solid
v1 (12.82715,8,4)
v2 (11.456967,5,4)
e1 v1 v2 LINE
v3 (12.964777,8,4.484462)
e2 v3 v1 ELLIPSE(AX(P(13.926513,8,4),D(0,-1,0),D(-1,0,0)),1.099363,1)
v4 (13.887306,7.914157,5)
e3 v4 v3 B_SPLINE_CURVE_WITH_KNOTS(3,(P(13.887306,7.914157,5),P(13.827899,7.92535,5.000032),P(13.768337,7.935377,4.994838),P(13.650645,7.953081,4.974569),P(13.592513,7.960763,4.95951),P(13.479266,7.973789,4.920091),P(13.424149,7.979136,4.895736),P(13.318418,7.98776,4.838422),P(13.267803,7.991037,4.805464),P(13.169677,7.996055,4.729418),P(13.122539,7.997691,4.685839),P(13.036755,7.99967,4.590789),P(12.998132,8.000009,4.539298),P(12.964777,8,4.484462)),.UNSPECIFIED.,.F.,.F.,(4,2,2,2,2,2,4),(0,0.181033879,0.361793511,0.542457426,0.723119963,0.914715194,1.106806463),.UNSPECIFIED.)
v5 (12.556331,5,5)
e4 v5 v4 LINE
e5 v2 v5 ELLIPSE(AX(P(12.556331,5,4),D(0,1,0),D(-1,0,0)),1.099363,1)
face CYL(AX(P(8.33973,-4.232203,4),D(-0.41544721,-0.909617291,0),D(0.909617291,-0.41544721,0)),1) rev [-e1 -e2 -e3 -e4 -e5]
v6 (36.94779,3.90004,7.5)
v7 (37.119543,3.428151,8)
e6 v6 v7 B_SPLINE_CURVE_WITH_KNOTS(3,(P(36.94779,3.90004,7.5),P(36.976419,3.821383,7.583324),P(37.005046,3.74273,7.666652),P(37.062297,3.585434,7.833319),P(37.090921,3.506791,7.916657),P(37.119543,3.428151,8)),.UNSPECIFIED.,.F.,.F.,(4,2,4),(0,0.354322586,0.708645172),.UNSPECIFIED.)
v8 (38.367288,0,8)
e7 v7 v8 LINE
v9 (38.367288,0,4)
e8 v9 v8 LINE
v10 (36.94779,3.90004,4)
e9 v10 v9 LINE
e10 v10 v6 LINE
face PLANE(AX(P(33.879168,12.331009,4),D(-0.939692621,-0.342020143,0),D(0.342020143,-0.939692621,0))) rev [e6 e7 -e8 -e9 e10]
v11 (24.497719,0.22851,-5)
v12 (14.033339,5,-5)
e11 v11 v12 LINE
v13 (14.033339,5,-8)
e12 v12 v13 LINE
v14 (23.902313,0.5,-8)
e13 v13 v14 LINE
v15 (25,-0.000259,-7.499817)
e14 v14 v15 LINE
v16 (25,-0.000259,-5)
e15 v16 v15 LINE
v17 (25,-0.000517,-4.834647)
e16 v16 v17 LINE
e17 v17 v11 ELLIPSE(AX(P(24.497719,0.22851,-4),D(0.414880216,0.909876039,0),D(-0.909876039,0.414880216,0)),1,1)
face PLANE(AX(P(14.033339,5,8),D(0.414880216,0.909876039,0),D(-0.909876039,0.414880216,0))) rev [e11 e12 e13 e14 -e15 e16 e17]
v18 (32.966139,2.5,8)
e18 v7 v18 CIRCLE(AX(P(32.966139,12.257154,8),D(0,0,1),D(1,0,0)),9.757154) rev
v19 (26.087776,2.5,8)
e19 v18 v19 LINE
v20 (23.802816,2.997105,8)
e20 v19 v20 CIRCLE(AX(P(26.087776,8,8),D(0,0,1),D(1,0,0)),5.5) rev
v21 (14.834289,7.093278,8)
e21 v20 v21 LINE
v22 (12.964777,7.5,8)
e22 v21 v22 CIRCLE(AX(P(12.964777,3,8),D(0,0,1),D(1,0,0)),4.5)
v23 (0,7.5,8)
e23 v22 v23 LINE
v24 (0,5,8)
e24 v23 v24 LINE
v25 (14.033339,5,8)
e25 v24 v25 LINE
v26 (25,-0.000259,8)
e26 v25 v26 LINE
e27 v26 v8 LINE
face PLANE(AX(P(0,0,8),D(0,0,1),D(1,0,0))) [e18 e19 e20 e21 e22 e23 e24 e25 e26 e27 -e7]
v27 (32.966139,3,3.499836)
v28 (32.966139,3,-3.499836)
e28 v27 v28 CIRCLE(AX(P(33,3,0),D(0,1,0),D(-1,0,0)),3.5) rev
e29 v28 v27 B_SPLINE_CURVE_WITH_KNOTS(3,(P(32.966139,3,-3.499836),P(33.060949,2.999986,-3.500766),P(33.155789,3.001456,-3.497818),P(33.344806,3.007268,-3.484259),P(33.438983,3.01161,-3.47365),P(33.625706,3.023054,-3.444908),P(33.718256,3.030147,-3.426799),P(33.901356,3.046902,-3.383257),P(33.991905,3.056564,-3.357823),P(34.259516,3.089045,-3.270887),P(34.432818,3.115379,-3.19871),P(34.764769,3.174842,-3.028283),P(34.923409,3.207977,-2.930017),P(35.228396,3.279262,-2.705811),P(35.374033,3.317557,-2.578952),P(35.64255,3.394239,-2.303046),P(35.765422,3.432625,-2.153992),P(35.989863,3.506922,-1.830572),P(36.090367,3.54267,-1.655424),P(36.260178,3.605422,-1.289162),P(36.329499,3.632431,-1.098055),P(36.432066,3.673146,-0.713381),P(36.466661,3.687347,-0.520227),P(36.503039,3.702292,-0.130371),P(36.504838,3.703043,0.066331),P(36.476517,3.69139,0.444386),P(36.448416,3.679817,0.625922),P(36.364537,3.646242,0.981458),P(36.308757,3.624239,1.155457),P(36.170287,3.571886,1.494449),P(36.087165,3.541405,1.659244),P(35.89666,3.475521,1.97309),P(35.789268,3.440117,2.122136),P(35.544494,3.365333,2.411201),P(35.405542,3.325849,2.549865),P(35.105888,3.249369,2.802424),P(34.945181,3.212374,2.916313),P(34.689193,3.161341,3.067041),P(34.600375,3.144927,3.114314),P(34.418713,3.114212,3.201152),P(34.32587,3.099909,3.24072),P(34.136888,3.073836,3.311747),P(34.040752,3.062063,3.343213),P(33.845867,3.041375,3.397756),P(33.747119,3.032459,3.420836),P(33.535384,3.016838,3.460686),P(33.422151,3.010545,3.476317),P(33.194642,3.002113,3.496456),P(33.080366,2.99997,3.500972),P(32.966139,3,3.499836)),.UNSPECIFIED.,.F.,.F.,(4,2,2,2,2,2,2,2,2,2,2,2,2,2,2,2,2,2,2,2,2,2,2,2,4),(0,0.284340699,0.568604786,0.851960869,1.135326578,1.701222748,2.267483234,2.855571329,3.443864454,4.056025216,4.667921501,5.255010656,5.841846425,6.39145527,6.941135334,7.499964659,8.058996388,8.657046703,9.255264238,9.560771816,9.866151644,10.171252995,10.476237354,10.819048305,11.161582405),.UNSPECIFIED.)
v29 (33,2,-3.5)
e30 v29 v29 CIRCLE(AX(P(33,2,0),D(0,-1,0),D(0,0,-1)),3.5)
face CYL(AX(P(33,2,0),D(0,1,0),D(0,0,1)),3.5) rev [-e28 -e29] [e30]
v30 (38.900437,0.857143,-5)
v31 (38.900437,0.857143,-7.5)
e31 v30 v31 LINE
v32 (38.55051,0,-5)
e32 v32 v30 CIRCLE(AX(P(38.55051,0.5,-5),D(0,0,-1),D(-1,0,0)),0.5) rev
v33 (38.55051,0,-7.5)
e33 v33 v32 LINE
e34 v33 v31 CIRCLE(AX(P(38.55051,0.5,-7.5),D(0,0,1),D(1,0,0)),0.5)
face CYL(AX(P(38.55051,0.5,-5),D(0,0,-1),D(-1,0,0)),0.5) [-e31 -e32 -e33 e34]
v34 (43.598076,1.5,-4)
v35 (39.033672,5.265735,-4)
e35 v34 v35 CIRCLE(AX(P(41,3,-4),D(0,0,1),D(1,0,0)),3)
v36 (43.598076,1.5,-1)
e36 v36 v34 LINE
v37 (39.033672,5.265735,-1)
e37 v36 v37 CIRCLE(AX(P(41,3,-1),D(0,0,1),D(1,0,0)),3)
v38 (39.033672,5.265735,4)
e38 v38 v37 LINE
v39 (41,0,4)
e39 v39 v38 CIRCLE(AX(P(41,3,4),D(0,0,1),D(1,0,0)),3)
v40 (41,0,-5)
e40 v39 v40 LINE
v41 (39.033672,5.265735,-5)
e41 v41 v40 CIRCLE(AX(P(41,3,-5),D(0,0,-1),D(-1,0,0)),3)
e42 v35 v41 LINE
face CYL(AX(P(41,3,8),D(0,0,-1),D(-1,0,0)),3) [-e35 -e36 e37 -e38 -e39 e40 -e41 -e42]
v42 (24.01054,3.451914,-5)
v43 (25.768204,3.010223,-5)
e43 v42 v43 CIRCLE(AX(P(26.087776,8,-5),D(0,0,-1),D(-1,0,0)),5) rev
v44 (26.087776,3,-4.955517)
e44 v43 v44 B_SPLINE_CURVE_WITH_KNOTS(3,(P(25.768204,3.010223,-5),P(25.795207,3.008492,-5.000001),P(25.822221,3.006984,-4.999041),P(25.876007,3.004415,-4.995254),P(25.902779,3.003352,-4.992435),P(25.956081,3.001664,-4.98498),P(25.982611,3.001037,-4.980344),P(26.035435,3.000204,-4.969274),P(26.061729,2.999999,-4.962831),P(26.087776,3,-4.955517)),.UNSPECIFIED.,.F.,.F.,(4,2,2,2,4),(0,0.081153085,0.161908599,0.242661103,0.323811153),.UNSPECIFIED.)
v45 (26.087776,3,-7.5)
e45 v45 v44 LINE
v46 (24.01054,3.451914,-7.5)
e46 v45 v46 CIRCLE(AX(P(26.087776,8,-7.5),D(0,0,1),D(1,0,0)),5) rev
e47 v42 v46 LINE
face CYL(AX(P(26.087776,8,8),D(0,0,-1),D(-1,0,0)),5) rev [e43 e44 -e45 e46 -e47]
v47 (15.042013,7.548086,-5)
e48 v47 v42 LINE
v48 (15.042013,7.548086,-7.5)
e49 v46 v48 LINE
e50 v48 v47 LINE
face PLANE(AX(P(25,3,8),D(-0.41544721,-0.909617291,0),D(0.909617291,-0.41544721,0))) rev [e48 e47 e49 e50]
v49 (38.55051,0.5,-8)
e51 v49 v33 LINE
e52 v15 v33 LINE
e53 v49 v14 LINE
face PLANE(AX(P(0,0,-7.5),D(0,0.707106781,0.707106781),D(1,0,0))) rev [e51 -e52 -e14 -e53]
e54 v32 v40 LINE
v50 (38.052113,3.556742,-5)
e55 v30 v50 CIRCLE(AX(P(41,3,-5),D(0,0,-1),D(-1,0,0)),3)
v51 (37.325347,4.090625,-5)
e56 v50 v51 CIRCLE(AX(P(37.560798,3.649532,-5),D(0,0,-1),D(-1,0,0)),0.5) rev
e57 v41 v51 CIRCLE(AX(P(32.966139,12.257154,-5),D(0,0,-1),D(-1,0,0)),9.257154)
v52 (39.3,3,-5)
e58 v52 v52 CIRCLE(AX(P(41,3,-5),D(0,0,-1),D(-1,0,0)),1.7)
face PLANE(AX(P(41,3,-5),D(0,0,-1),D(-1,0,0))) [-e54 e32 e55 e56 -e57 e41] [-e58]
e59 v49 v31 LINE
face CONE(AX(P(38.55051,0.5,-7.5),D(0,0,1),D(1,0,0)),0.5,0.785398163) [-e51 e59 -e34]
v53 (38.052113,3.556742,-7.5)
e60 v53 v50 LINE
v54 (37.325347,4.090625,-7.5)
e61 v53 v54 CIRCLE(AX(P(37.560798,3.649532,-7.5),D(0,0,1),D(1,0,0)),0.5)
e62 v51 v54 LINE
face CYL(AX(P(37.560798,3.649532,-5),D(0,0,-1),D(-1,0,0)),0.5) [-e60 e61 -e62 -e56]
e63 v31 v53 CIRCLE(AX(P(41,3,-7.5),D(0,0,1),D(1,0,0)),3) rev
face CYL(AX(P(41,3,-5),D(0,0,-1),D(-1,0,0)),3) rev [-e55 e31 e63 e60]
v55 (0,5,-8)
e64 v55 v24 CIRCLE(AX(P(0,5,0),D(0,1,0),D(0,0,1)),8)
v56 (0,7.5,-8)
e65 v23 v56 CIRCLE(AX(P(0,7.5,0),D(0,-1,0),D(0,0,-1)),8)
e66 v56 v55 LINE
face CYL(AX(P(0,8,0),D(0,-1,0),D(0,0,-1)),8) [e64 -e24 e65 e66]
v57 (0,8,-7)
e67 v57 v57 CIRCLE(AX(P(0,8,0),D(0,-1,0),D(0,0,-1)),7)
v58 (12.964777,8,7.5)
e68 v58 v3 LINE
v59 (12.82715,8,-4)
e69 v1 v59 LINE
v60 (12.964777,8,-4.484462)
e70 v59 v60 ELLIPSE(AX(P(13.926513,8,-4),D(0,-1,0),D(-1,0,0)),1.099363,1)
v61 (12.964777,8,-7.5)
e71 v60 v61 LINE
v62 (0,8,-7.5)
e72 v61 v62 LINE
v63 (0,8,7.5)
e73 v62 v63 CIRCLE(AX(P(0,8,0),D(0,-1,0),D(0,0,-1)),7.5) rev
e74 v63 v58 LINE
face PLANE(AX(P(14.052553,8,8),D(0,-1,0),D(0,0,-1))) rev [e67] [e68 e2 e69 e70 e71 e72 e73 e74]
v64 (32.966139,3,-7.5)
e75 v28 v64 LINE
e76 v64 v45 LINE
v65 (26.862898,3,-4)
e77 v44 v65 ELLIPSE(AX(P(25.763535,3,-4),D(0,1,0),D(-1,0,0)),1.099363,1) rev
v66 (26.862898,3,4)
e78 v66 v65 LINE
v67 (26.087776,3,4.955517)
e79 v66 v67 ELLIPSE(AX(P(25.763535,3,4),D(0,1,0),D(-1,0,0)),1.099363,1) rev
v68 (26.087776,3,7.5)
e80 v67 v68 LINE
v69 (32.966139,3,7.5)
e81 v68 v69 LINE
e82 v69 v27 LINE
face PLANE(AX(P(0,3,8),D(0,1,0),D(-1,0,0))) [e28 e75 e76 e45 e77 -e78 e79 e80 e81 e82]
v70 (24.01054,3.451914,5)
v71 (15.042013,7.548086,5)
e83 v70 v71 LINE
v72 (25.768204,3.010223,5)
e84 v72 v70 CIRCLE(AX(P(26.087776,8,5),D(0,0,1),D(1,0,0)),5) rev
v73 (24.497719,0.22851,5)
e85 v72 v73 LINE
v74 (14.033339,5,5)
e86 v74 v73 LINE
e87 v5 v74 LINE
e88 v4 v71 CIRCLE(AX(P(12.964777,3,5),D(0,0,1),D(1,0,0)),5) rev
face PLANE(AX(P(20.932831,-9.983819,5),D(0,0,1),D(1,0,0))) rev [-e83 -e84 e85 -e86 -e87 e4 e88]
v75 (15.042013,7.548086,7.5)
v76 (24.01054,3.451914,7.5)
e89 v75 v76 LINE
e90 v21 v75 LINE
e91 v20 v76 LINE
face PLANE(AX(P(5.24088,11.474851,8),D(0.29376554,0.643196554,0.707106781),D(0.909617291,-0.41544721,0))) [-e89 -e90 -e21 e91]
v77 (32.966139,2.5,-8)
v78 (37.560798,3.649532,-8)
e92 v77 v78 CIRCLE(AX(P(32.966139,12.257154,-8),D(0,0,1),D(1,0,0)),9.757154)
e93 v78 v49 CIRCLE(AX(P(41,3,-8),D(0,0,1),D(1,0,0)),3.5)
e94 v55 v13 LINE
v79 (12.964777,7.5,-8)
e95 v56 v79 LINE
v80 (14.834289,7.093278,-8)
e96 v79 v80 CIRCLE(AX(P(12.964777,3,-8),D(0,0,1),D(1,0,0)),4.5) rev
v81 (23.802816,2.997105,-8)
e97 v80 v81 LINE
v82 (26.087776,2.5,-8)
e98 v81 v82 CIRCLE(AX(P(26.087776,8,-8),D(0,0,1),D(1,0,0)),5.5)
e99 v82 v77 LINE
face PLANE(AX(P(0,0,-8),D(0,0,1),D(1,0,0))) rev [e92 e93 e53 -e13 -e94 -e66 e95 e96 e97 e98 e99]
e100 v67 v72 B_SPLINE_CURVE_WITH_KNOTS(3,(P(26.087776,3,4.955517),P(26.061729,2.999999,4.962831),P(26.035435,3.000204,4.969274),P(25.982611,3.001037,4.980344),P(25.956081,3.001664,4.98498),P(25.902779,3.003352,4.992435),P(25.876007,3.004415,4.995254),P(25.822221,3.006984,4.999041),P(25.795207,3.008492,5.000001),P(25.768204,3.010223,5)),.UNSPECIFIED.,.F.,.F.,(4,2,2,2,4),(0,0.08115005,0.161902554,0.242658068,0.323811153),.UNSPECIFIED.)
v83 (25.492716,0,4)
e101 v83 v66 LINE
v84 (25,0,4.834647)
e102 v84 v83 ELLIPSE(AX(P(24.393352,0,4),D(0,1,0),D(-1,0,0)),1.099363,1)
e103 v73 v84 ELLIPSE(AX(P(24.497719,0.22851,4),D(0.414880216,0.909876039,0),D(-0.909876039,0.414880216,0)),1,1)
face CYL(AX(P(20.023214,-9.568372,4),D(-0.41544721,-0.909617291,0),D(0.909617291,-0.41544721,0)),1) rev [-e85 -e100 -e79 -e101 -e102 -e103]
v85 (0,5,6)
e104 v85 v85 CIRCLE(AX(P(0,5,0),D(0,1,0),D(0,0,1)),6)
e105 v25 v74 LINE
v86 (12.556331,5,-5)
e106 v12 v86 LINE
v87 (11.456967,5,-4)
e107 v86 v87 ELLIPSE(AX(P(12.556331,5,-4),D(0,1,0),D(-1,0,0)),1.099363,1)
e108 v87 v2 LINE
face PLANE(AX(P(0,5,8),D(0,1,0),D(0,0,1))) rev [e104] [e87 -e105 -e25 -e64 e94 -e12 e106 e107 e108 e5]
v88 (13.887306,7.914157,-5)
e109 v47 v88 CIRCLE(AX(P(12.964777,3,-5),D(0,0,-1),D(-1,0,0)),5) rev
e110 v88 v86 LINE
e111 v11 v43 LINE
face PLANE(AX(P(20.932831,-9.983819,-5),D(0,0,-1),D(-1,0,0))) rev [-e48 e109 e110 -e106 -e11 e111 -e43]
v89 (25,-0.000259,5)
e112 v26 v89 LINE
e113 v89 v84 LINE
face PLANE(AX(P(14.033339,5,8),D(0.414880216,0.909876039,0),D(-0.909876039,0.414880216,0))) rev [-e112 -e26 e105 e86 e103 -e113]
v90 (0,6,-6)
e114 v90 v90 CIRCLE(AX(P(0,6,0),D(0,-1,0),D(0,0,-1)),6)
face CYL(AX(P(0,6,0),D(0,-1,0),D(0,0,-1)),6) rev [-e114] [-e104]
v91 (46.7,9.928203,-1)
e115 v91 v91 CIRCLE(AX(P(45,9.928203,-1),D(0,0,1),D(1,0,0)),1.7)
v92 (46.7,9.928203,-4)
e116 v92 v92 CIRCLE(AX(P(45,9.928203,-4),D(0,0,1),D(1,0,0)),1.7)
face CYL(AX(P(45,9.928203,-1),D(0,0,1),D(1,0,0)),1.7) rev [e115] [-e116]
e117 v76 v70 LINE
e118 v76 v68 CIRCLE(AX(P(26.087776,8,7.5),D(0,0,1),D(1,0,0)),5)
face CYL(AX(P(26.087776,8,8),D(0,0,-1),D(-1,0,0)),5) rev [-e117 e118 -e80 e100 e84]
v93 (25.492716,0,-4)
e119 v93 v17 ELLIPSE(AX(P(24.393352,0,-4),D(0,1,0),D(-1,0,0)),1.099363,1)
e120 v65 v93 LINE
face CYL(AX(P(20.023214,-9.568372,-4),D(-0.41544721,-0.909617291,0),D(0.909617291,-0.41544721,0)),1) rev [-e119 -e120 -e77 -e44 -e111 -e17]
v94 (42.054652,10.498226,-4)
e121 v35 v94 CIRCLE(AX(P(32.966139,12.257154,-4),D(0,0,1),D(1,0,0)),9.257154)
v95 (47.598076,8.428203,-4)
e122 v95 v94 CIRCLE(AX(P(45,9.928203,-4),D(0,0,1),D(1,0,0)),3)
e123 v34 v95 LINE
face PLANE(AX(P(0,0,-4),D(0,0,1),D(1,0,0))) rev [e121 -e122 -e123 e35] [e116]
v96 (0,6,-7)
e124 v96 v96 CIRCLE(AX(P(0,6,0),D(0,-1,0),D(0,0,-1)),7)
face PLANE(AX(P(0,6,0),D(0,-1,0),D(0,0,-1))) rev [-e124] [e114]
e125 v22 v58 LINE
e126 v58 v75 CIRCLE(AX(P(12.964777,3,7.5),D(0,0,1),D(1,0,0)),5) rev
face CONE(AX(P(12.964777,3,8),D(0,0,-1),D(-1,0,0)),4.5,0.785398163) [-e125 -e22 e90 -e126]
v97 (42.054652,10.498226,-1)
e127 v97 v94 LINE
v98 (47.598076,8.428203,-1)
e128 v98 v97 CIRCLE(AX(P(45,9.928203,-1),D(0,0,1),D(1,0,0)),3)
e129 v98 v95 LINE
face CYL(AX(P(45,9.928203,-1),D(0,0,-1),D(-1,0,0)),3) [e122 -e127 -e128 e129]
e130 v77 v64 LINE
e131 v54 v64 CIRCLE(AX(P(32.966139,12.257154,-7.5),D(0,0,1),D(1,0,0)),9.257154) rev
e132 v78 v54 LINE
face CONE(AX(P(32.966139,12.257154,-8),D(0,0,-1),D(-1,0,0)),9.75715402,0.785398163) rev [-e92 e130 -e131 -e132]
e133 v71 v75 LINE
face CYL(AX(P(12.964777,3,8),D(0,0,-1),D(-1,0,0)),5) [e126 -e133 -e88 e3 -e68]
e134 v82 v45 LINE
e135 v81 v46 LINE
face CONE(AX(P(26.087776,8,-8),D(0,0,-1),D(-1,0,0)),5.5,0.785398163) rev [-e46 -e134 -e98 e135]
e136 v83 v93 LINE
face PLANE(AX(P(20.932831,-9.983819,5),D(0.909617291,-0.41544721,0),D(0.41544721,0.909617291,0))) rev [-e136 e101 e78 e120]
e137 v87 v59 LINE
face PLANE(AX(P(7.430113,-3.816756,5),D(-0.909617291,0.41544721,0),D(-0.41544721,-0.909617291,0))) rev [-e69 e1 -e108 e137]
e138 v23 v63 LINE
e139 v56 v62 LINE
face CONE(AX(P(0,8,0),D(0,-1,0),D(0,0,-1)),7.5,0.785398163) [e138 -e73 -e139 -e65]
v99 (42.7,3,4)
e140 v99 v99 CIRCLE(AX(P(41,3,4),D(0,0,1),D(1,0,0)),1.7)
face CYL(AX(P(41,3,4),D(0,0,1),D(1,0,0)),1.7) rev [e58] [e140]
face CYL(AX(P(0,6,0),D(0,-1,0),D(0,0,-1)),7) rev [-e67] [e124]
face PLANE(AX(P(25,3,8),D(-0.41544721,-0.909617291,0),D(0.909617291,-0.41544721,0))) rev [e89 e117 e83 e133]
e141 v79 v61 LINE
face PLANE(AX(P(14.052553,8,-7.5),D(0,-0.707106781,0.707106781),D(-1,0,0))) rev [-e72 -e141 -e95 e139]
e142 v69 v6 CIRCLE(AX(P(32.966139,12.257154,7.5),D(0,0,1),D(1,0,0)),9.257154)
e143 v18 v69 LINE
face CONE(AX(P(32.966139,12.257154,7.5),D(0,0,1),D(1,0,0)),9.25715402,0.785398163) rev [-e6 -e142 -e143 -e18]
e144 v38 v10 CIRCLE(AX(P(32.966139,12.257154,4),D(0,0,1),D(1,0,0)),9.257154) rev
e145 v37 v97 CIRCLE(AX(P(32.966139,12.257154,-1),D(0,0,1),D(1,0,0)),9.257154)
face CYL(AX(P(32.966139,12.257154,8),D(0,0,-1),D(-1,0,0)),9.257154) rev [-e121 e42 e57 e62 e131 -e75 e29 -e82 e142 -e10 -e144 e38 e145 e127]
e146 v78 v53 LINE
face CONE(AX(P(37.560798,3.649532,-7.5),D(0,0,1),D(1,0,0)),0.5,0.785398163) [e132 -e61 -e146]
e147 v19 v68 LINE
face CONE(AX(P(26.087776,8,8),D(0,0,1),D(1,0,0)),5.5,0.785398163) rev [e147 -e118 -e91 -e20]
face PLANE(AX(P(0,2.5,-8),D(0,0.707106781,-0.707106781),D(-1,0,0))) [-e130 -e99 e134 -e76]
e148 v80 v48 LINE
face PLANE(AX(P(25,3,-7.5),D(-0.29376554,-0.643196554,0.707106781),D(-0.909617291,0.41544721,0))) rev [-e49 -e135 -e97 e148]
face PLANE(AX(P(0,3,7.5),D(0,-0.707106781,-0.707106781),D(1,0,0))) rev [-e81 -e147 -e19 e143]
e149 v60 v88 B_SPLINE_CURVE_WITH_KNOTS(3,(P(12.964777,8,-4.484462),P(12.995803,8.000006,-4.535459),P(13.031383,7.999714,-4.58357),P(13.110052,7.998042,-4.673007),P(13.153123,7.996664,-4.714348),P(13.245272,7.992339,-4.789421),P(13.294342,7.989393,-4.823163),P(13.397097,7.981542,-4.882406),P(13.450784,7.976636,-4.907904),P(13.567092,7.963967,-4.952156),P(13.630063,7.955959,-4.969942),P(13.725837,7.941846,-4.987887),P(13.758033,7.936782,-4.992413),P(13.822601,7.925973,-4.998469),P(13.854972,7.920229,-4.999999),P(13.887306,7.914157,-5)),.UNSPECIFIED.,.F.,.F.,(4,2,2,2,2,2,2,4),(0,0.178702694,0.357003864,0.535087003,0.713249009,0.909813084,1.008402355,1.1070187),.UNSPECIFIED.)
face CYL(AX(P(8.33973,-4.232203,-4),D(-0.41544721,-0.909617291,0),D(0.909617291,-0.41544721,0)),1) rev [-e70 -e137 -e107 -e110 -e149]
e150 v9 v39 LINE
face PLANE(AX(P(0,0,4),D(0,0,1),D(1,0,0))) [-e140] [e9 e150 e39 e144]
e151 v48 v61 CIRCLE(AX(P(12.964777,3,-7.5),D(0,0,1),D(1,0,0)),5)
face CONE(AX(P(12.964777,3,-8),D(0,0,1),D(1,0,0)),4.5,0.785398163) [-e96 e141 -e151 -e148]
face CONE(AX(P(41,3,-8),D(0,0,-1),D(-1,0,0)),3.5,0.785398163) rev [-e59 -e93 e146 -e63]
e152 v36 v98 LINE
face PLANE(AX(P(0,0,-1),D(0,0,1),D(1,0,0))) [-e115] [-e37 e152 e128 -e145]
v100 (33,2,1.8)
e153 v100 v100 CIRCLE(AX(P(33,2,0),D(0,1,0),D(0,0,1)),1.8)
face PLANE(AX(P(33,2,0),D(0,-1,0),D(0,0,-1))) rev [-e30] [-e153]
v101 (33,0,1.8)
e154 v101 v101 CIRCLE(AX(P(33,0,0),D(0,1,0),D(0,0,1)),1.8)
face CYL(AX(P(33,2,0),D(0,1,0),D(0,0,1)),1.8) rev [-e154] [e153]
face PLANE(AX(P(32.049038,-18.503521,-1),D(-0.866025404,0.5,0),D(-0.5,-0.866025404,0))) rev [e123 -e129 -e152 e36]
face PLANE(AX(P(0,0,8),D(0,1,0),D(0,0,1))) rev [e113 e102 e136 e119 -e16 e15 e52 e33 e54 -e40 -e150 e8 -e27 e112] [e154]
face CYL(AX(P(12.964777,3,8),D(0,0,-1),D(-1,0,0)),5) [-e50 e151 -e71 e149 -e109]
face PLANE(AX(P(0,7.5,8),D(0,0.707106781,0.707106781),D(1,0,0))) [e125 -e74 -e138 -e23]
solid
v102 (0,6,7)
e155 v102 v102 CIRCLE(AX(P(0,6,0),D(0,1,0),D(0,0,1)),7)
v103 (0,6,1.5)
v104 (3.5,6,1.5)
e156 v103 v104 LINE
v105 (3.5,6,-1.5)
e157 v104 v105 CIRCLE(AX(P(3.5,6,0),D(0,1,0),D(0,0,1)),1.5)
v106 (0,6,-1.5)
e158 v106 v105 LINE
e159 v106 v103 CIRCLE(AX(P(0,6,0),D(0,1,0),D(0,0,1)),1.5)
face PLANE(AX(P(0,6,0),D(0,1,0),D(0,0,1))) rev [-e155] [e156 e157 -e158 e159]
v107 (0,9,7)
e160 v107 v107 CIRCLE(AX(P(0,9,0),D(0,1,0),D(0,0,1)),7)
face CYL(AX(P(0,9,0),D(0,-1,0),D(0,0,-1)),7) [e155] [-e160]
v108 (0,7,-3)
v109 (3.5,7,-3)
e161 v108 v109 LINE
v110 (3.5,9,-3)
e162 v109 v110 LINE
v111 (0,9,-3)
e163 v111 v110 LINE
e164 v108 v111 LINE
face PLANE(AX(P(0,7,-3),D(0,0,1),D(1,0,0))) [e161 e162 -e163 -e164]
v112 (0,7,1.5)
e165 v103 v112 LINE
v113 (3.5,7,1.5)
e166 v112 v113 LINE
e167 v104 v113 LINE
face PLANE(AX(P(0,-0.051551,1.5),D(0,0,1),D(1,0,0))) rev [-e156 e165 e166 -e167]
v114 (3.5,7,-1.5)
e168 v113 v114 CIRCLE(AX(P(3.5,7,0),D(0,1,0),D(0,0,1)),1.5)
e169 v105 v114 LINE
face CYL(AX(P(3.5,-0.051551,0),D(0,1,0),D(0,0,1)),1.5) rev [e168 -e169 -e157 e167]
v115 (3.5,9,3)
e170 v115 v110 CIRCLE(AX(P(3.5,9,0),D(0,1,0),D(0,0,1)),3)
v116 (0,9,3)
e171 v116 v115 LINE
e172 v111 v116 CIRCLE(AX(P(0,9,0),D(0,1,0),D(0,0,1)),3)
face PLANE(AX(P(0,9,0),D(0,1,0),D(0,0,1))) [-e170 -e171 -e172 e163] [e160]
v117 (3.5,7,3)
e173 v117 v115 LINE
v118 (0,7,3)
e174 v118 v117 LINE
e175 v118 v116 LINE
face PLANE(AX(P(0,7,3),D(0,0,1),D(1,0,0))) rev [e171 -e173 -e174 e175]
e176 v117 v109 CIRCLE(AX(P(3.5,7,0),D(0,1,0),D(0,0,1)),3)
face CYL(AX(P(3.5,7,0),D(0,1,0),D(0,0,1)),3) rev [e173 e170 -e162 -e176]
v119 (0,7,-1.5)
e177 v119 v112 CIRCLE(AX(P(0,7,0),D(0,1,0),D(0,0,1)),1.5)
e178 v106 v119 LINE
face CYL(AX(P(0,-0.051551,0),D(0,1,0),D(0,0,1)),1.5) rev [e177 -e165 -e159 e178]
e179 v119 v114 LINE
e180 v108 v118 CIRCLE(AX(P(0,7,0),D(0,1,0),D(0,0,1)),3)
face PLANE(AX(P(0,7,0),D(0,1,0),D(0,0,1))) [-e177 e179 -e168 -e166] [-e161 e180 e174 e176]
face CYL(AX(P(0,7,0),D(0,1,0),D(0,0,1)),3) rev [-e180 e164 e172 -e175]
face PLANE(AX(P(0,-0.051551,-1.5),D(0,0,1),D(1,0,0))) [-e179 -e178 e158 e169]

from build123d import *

# Parameters (mm, degrees)
BOSS_EXTRUDE1_DEPTH  = 8
BOSS_EXTRUDE2_START  = -1
BOSS_EXTRUDE2_DEPTH  = 3
CUT_EXTRUDE1_START   = -3
SKETCH2_R            = 3
CUT_EXTRUDE1_DEPTH   = 3
CUT_EXTRUDE2_DEPTH   = 4
SKETCH4_R            = 3.5
CUT_EXTRUDE3_DEPTH   = 8
M3_CLEARANCE_HOLE2_D = 3.4
M3_CLEARANCE_HOLE3_D = 3.4
SKETCH10_R           = 8
BOSS_EXTRUDE3_DEPTH  = 3
BOSS_EXTRUDE6_DEPTH  = 8
SKETCH17_W           = 6
SKETCH17_H           = 6
SKETCH18_R           = 7
BOSS_EXTRUDE5_DEPTH  = 3
CUT_EXTRUDE6_DEPTH   = 2
CUT_EXTRUDE7_DEPTH   = 50.487466177
FILLET5_START        = -8
FILLET5_DEPTH        = 3
SKETCH22_W           = 1.8
SKETCH22_H           = 2.051551118
FILLET12_R           = 5
CHAMFER2_SIZE        = 0.5
SKETCH27_W           = 14.844395474
SKETCH27_H           = 10
CUT_EXTRUDE11_DEPTH  = 13.5
FILLET13_R           = 1


with BuildPart() as part:
    # Sketch1 → Boss-Extrude1 (new, symmetric)
    with BuildSketch(Plane.XY):
        with BuildLine():
            ThreePointArc((42.5, 5.598076211), (40.713681898, 5.986305735), (39.03367226, 5.265735028))
            ThreePointArc((39.03367226, 5.265735028), (36.204522615, 3.584912586), (32.966138903, 3))
            Line((32.966138903, 3), (25, 3))
            Line((25, 3), (25, 0))
            Line((25, 0), (41, 0))
            ThreePointArc((41, 0), (43.897777479, 2.223542865), (42.5, 5.598076211))
        make_face()
    extrude(amount=BOSS_EXTRUDE1_DEPTH, both=True)

    # Sketch1<3> → Boss-Extrude2 (add)
    with BuildSketch(Plane.XY.offset(BOSS_EXTRUDE2_START)):
        with BuildLine():
            ThreePointArc((39.03367226, 5.265735028), (42.909179564, 5.314094508), (43.598076211, 1.5))
            Line((43.598076211, 1.5), (47.598076211, 8.42820323))
            ThreePointArc((47.598076211, 8.42820323), (46.049474916, 12.738648462), (42.054652064, 10.498225632))
            ThreePointArc((42.054652064, 10.498225632), (40.983069487, 7.628577072), (39.03367226, 5.265735028))
        make_face()
    extrude(amount=-BOSS_EXTRUDE2_DEPTH)

    # Sketch2 → Cut-Extrude1 (cut)
    with BuildSketch(Plane(origin=(0, 0, -8), x_dir=(-1, 0, 0), z_dir=(0, 0, -1)).offset(CUT_EXTRUDE1_START)):
        with Locations((-41, 3)):
            Circle(SKETCH2_R)
    extrude(amount=CUT_EXTRUDE1_DEPTH, mode=Mode.SUBTRACT)

    # Sketch3 → Cut-Extrude2 (cut)
    with BuildSketch(Plane.XY.offset(8)):
        with BuildLine():
            ThreePointArc((39.033672152, 5.265734934), (38.036918658, 4.512343291), (36.947790029, 3.900039993))
            Line((36.947790029, 3.900039993), (38.367288499, 0))
            Line((38.367288499, 0), (41, 0))
            ThreePointArc((41, 0), (43.810445232, 4.049474916), (39.033672152, 5.265734934))
        make_face()
    extrude(amount=-CUT_EXTRUDE2_DEPTH, mode=Mode.SUBTRACT)

    # Sketch4 → Cut-Extrude3 (cut)
    with BuildSketch(Plane(origin=(0, 10, 0), x_dir=(-1, 0, 0), z_dir=(0, -1, 0))):
        with Locations(Location((-33, 0, 0), (0, 0, 270.554322343))):
            Circle(SKETCH4_R)
    extrude(amount=CUT_EXTRUDE3_DEPTH, mode=Mode.SUBTRACT)

    # M3 Clearance Hole2 (through all)
    with Locations(Plane(origin=(41, 3, 4), x_dir=(1, 0, 0), z_dir=(0, 0, 1))):
        with Locations((0, 0)):
            Hole(M3_CLEARANCE_HOLE2_D / 2)

    # M3 Clearance Hole3 (through all)
    with Locations(Plane(origin=(45, 9.92820323, -1), x_dir=(1, 0, 0), z_dir=(0, 0, 1))):
        with Locations((0, 0)):
            Hole(M3_CLEARANCE_HOLE3_D / 2)



with BuildPart() as body_2:
    # Sketch10 → Boss-Extrude3 (new body)
    with BuildSketch(Plane(origin=(0, 5, 0), x_dir=(1, 0, 0), z_dir=(0, 1, 0))):
        with Locations(Location((0, 0, 0), (0, 0, 270))):
            Circle(SKETCH10_R)
    extrude(amount=BOSS_EXTRUDE3_DEPTH)


with BuildPart() as part_1:
    add(part.part)

    add(body_2.part)  # Boss-Extrude6 merges body 2
    # Sketch25 → Boss-Extrude6 (add, symmetric)
    with BuildSketch(Plane.XY):
        Polygon((0, 8), (0, 5), (14.033339128, 5), (25, -0.000517039), (25, 3), (14.052552674, 8), align=None)
    extrude(amount=BOSS_EXTRUDE6_DEPTH, both=True)

    # Sketch17 → Cut-Revolve1 (revolve, cut)
    with BuildSketch(Plane.XY, mode=Mode.PRIVATE) as cut_revolve1_sk:
        Polygon((0, 8), (0, 6), (6, 6), (7, 6), (7, 8), align=None)
        with Locations((3, 3)):
            Rectangle(SKETCH17_W, SKETCH17_H)
    revolve(cut_revolve1_sk.sketch.rotate(Axis((0, 6, 0), (0, 1, 0)), 90), axis=Axis((0, 6, 0), (0, 1, 0)), mode=Mode.SUBTRACT)

    # Fillet5: read off the stored shape, not the designer's step
    # Fillet5 outline → Fillet5 (cut)
    with BuildSketch(Plane.XY.offset(FILLET5_START)):
        with BuildLine():
            ThreePointArc((41, 0), (39.866106581, 0.222539701), (38.900437363, 0.857142857))
            ThreePointArc((38.900437363, 0.857142857), (39.013420307, 0.311017763), (38.550510257, 0))
            Line((38.550510257, 0), (41, 0))
        make_face()
        with BuildLine():
            ThreePointArc((37.325347494, 4.090624707), (37.856812417, 4.05249044), (38.052112821, 3.556741573))
            ThreePointArc((38.052112821, 3.556741573), (38.398550037, 4.494141254), (39.033672152, 5.265734934))
            ThreePointArc((39.033672152, 5.265734934), (38.212514543, 4.630198979), (37.325347494, 4.090624707))
        make_face()
    extrude(amount=FILLET5_DEPTH, mode=Mode.SUBTRACT)

    # Sketch22 → M3 Clearance Hole5 (revolve, cut)
    with BuildSketch(Plane(origin=(33, 2, 0), x_dir=(0, 0, 1), z_dir=(1, 0, 0))):
        with Locations((0.9, 1.025775559)):
            Rectangle(SKETCH22_W, SKETCH22_H)
    revolve(axis=Axis((33, 8.35, 0), (0, -1, 0)), mode=Mode.SUBTRACT)

    # Fillet12
    fillet12_edges = [part_1.edges().sort_by_distance(p)[0] for p in [
        (25, 3, 0),
        (14.052552674, 8, 0),
    ]]
    fillet(fillet12_edges, radius=FILLET12_R)

    # Chamfer2
    # the kernel refuses this chamfer: 0.5 mm, written as the material it takes off along each edge
    with BuildSketch(Plane(origin=(41, 3, -8), x_dir=(-0.6998542122558625, -0.7142857142542653, 0), z_dir=(0.7142857142542653, -0.6998542122558625, 0))) as chamfer2_piece_1:
        with BuildLine():
            Line((3.514142136, 0.014142136), (2.985857864, -0.514142136))
            Line((2.985857864, -0.514142136), (2.975857864, -0.514142136))
            ThreePointArc((2.975857864, -0.514142136), (2.99, -0.257071068), (2.99, 0))
            Line((2.99, 0), (3, 0.01))
            ThreePointArc((3, 0.01), (3.257071068, 0.01), (3.514142136, 0.024142136))
            Line((3.514142136, 0.024142136), (3.514142136, 0.014142136))
        make_face()
    revolve(axis=Axis((41, 3, -8), (0, 0, -1)), revolution_arc=56.279671506, mode=Mode.SUBTRACT)
    with BuildSketch(Plane(origin=(37.560798292, 3.649531835, -8), x_dir=(-0.4709015955498913, 0.8821857442220241, 0), z_dir=(-0.8821857442220241, -0.4709015955498913, 0))) as chamfer2_piece_2:
        with BuildLine():
            Line((0.5 - CHAMFER2_SIZE, -CHAMFER2_SIZE * 8.25029964485e-10), (0.514142135, -0.514142136))
            Line((0.514142135, -0.514142136), (0.524142135, -0.514142136))
            ThreePointArc((0.524142135, -0.514142136), (0.51, -0.257071068), (0.51, 0))
            Line((0.51, 0), (0.5, 0.01))
            Line((0.5, 0.01), (0, 0.023753138))
            Line((0, 0.023753138), (0.5 - CHAMFER2_SIZE, -CHAMFER2_SIZE * 8.25029964485e-10))
        make_face()
    revolve(axis=Axis((37.560798292, 3.649531835, -8), (0, 0, -1)), revolution_arc=128.787817104, mode=Mode.SUBTRACT)
    with BuildSketch(Plane(origin=(38.550510258, 0.5, -8), x_dir=(0.6998542113861314, 0.7142857151064245, 0), z_dir=(-0.7142857151064245, 0.6998542113861314, 0))) as chamfer2_piece_3:
        with BuildLine():
            Line((0.5 - CHAMFER2_SIZE, -CHAMFER2_SIZE * 6.45420560746e-10), (0.514142135, -0.514142136))
            Line((0.514142135, -0.514142136), (0.524142135, -0.514142136))
            ThreePointArc((0.524142135, -0.514142136), (0.51, -0.257071068), (0.51, 0))
            Line((0.51, 0), (0.5, 0.01))
            Line((0.5, 0.01), (0, 0.023753138))
            Line((0, 0.023753138), (0.5 - CHAMFER2_SIZE, -CHAMFER2_SIZE * 6.45420560746e-10))
        make_face()
    revolve(axis=Axis((38.550510258, 0.5, -8), (0, 0, -1)), revolution_arc=135.584691531, mode=Mode.SUBTRACT)
    with BuildSketch(Plane(origin=(12.964776572, 8, -8), x_dir=(0, 0, 1), z_dir=(-1, 0, 0)), Plane(origin=(12.964776572, 8, 8), x_dir=(0, -1, 0), z_dir=(-1, 0, 0))) as chamfer2_piece_4:
        with BuildLine():
            Line((0.514142136, 0.014142136), (-0.014142136, -0.514142136))
            Line((-0.014142136, -0.514142136), (-0.024142136, -0.514142136))
            ThreePointArc((-0.024142136, -0.514142136), (-0.01, -0.257071068), (-0.01, 0))
            Line((-0.01, 0), (0, 0.01))
            ThreePointArc((0, 0.01), (0.257071068, 0.01), (0.514142136, 0.024142136))
            Line((0.514142136, 0.024142136), (0.514142136, 0.014142136))
        make_face()
    extrude(amount=12.964776572, mode=Mode.SUBTRACT)
    with BuildSketch(Plane(origin=(24.01054005, 3.451913547, -8), x_dir=(0, 0, 1), z_dir=(-0.9096172905898658, 0.41544721043708044, 0)), Plane(origin=(24.01054005, 3.451913547, 8), x_dir=(-0.4154472104370804, -0.9096172905898657, 0), z_dir=(-0.9096172905898658, 0.41544721043708044, 0))) as chamfer2_piece_5:
        with BuildLine():
            Line((0.514142136, 0.014142136), (-0.014142136, -0.514142136))
            Line((-0.014142136, -0.514142136), (-0.024142136, -0.514142136))
            ThreePointArc((-0.024142136, -0.514142136), (-0.01, -0.257071068), (-0.01, 0))
            Line((-0.01, 0), (0, 0.01))
            ThreePointArc((0, 0.01), (0.257071068, 0.01), (0.514142136, 0.024142136))
            Line((0.514142136, 0.024142136), (0.514142136, 0.014142136))
        make_face()
    extrude(amount=9.859671224, mode=Mode.SUBTRACT)
    with BuildSketch(Plane(origin=(32.966138903, 3, -8), x_dir=(0, 0, 1), z_dir=(-1, 0, 0)), Plane(origin=(32.966138903, 3, 8), x_dir=(0, -1, 0), z_dir=(-1, 0, 0))) as chamfer2_piece_6:
        with BuildLine():
            Line((0.514142136, 0.014142136), (-0.014142136, -0.514142136))
            Line((-0.014142136, -0.514142136), (-0.024142136, -0.514142136))
            ThreePointArc((-0.024142136, -0.514142136), (-0.01, -0.257071068), (-0.01, 0))
            Line((-0.01, 0), (0, 0.01))
            ThreePointArc((0, 0.01), (0.257071068, 0.01), (0.514142136, 0.024142136))
            Line((0.514142136, 0.024142136), (0.514142136, 0.014142136))
        make_face()
    extrude(amount=6.878362801, mode=Mode.SUBTRACT)
    with BuildSketch(Plane(origin=(12.964776572, 3, -8), x_dir=(0.4154472104370811, 0.9096172905898655, 0), z_dir=(0.9096172905898655, -0.4154472104370811, 0))) as chamfer2_piece_7:
        with BuildLine():
            Line((5.014142136, 0.514142136), (4.485857864, -0.014142136))
            Line((4.485857864, -0.014142136), (4.485857864, -0.024142136))
            ThreePointArc((4.485857864, -0.024142136), (4.742928932, -0.01), (5, -0.01))
            Line((5, -0.01), (5.01, 0))
            ThreePointArc((5.01, 0), (5.01, 0.257071068), (5.024142136, 0.514142136))
            Line((5.024142136, 0.514142136), (5.014142136, 0.514142136))
        make_face()
    revolve(axis=Axis((12.964776572, 3, -8), (0, 0, 1)), revolution_arc=24.54748261, mode=Mode.SUBTRACT)
    with BuildSketch(Plane(origin=(12.964776572, 3, 8), x_dir=(0.4154472104370811, 0.9096172905898655, 0), z_dir=(0.9096172905898655, -0.4154472104370811, 0))) as chamfer2_piece_8:
        with BuildLine():
            Line((4.485857864, 0.014142136), (5.014142136, -0.514142136))
            Line((5.014142136, -0.514142136), (5.024142136, -0.514142136))
            ThreePointArc((5.024142136, -0.514142136), (5.01, -0.257071068), (5.01, 0))
            Line((5.01, 0), (5, 0.01))
            ThreePointArc((5, 0.01), (4.742928932, 0.01), (4.485857864, 0.024142136))
            Line((4.485857864, 0.024142136), (4.485857864, 0.014142136))
        make_face()
    revolve(axis=Axis((12.964776572, 3, 8), (0, 0, 1)), revolution_arc=24.54748261, mode=Mode.SUBTRACT)
    with BuildSketch(Plane(origin=(26.087776102, 8, -8), x_dir=(0, -1, 0), z_dir=(1, 0, 0))) as chamfer2_piece_9:
        with BuildLine():
            Line((4.985857864, -0.514142136), (5.514142136, 0.014142136))
            Line((5.514142136, 0.014142136), (5.514142136, 0.024142136))
            ThreePointArc((5.514142136, 0.024142136), (5.257071068, 0.01), (5, 0.01))
            Line((5, 0.01), (4.99, 0))
            ThreePointArc((4.99, 0), (4.99, -0.257071068), (4.975857864, -0.514142136))
            Line((4.975857864, -0.514142136), (4.985857864, -0.514142136))
        make_face()
    revolve(axis=Axis((26.087776102, 8, -8), (0, 0, -1)), revolution_arc=24.54748261, mode=Mode.SUBTRACT)
    with BuildSketch(Plane(origin=(26.087776102, 8, 8), x_dir=(0, -1, 0), z_dir=(1, 0, 0))) as chamfer2_piece_10:
        with BuildLine():
            Line((5.514142136, -0.014142136), (4.985857864, 0.514142136))
            Line((4.985857864, 0.514142136), (4.975857864, 0.514142136))
            ThreePointArc((4.975857864, 0.514142136), (4.99, 0.257071068), (4.99, 0))
            Line((4.99, 0), (5, -0.01))
            ThreePointArc((5, -0.01), (5.257071068, -0.01), (5.514142136, -0.024142136))
            Line((5.514142136, -0.024142136), (5.514142136, -0.014142136))
        make_face()
    revolve(axis=Axis((26.087776102, 8, 8), (0, 0, -1)), revolution_arc=24.54748261, mode=Mode.SUBTRACT)
    with BuildSketch(Plane(origin=(32.966138903, 12.25715402, 8), x_dir=(0.550971832426983, -0.8345238402059301, 0), z_dir=(0.8345238402059301, 0.550971832426983, 0))) as chamfer2_piece_11:
        with BuildLine():
            Line((9.771296156, -0.014142136), (9.243011885, 0.514142136))
            Line((9.243011885, 0.514142136), (9.233011885, 0.514142136))
            ThreePointArc((9.233011885, 0.514142136), (9.24715402, 0.257071068), (9.24715402, 0))
            Line((9.24715402, 0), (9.25715402, -0.01))
            ThreePointArc((9.25715402, -0.01), (9.514225088, -0.01), (9.771296156, -0.024142136))
            Line((9.771296156, -0.024142136), (9.771296156, -0.014142136))
        make_face()
    revolve(axis=Axis((32.966138903, 12.25715402, 8), (0, 0, -1)), revolution_arc=33.433710309, mode=Mode.SUBTRACT)
    with BuildSketch(Plane(origin=(32.966138903, 12.25715402, -8), x_dir=(0.4709015947015472, -0.8821857446748615, 0), z_dir=(0.8821857446748615, 0.4709015947015472, 0))) as chamfer2_piece_12:
        with BuildLine():
            Line((9.243011885, -0.514142136), (9.771296156, 0.014142136))
            Line((9.771296156, 0.014142136), (9.771296156, 0.024142136))
            ThreePointArc((9.771296156, 0.024142136), (9.514225088, 0.01), (9.25715402, 0.01))
            Line((9.25715402, 0.01), (9.24715402, 0))
            ThreePointArc((9.24715402, 0), (9.24715402, -0.257071068), (9.233011885, -0.514142136))
            Line((9.233011885, -0.514142136), (9.243011885, -0.514142136))
        make_face()
    revolve(axis=Axis((32.966138903, 12.25715402, -8), (0, 0, -1)), revolution_arc=28.092836925, mode=Mode.SUBTRACT)
    with BuildSketch(Plane(origin=(23.714158506, 0, -8), x_dir=(0, 0, 1), z_dir=(1, 0, 0))) as chamfer2_piece_13:
        with BuildLine():
            Line((0.514142136, 0.014142136), (-0.014142136, -0.514142136))
            Line((-0.014142136, -0.514142136), (-0.024142136, -0.514142136))
            ThreePointArc((-0.024142136, -0.514142136), (-0.01, -0.257071068), (-0.01, 0))
            Line((-0.01, 0), (0, 0.01))
            ThreePointArc((0, 0.01), (0.257071068, 0.01), (0.514142136, 0.024142136))
            Line((0.514142136, 0.024142136), (0.514142136, 0.014142136))
        make_face()
    extrude(amount=14.836351751, mode=Mode.SUBTRACT)
    with BuildSketch(Plane(origin=(0, 8, 0), x_dir=(0, 0, -1), z_dir=(1, 0, 0))) as chamfer2_piece_14:
        with BuildLine():
            Line((7.485857864, 0.014142136), (8.014142136, -0.514142136))
            Line((8.014142136, -0.514142136), (8.024142136, -0.514142136))
            ThreePointArc((8.024142136, -0.514142136), (8.01, -0.257071068), (8.01, 0))
            Line((8.01, 0), (8, 0.01))
            ThreePointArc((8, 0.01), (7.742928932, 0.01), (7.485857864, 0.024142136))
            Line((7.485857864, 0.024142136), (7.485857864, 0.014142136))
        make_face()
    revolve(axis=Axis((0, 8, 0), (0, 1, 0)), revolution_arc=180, mode=Mode.SUBTRACT)

    # Sketch27 → Cut-Extrude11 (cut, symmetric)
    with BuildSketch(Plane(origin=(5.448603514, 11.929659995, 0), x_dir=(0.9096172905898658, -0.4154472104370803, 0), z_dir=(0.41544721043708027, 0.9096172905898657, 0))):
        with Locations((15.766417415, 0)):
            Rectangle(SKETCH27_W, SKETCH27_H)
    extrude(amount=CUT_EXTRUDE11_DEPTH, both=True, mode=Mode.SUBTRACT)

    # Fillet13
    fillet13_edges = [part_1.edges().sort_by_distance(p)[0] for p in [
        (26.1778071, 1.5, 5),
        (26.1778071, 1.5, -5),
        (12.14205871, 6.5, 5),
        (12.14205871, 6.5, -5),
    ]]
    fillet(fillet13_edges, radius=FILLET13_R)


with BuildPart() as body_2_2:
    # Sketch18 → Boss-Extrude5 (new body)
    with BuildSketch(Plane(origin=(0, 6, 0), x_dir=(1, 0, 0), z_dir=(0, 1, 0))):
        with Locations(Location((0, 0, 0), (0, 0, 270))):
            Circle(SKETCH18_R)
    extrude(amount=BOSS_EXTRUDE5_DEPTH)

    # Sketch19 → Cut-Extrude6 (cut)
    # profile 1 of 2: a face of its own
    with BuildSketch(Plane(origin=(0, 9, 0), x_dir=(1, 0, 0), z_dir=(0, 1, 0))):
        with BuildLine():
            Line((0, -3), (3.5, -3))
            ThreePointArc((3.5, -3), (6.5, 0), (3.5, 3))
            Line((3.5, 3), (0, 3))
            ThreePointArc((0, 3), (-3, 0), (0, -3))
        make_face()
        with BuildLine():
            ThreePointArc((3.5, -1.5), (5, 0), (3.5, 1.5))
            Line((3.5, 1.5), (0, 1.5))
            ThreePointArc((0, 1.5), (-1.5, 0), (0, -1.5))
            Line((0, -1.5), (3.5, -1.5))
        make_face(mode=Mode.SUBTRACT)
    # profile 2 of 2: a face of its own
    with BuildSketch(Plane(origin=(0, 9, 0), x_dir=(1, 0, 0), z_dir=(0, 1, 0))):
        with BuildLine():
            Line((0, -1.5), (3.5, -1.5))
            ThreePointArc((3.5, -1.5), (5, 0), (3.5, 1.5))
            Line((3.5, 1.5), (0, 1.5))
            ThreePointArc((0, 1.5), (-1.5, 0), (0, -1.5))
        make_face()
    extrude(amount=-CUT_EXTRUDE6_DEPTH, mode=Mode.SUBTRACT)

    # Sketch19<3> → Cut-Extrude7 (cut, through all)
    with BuildSketch(Plane(origin=(0, 9, 0), x_dir=(1, 0, 0), z_dir=(0, 1, 0))):
        with BuildLine():
            Line((0, 1.5), (3.5, 1.5))
            ThreePointArc((3.5, 1.5), (5, 0), (3.5, -1.5))
            Line((3.5, -1.5), (0, -1.5))
            ThreePointArc((0, -1.5), (-1.5, 0), (0, 1.5))
        make_face()
    extrude(amount=-CUT_EXTRUDE7_DEPTH, mode=Mode.SUBTRACT)


solid = Compound([part_1.part, body_2_2.part])
